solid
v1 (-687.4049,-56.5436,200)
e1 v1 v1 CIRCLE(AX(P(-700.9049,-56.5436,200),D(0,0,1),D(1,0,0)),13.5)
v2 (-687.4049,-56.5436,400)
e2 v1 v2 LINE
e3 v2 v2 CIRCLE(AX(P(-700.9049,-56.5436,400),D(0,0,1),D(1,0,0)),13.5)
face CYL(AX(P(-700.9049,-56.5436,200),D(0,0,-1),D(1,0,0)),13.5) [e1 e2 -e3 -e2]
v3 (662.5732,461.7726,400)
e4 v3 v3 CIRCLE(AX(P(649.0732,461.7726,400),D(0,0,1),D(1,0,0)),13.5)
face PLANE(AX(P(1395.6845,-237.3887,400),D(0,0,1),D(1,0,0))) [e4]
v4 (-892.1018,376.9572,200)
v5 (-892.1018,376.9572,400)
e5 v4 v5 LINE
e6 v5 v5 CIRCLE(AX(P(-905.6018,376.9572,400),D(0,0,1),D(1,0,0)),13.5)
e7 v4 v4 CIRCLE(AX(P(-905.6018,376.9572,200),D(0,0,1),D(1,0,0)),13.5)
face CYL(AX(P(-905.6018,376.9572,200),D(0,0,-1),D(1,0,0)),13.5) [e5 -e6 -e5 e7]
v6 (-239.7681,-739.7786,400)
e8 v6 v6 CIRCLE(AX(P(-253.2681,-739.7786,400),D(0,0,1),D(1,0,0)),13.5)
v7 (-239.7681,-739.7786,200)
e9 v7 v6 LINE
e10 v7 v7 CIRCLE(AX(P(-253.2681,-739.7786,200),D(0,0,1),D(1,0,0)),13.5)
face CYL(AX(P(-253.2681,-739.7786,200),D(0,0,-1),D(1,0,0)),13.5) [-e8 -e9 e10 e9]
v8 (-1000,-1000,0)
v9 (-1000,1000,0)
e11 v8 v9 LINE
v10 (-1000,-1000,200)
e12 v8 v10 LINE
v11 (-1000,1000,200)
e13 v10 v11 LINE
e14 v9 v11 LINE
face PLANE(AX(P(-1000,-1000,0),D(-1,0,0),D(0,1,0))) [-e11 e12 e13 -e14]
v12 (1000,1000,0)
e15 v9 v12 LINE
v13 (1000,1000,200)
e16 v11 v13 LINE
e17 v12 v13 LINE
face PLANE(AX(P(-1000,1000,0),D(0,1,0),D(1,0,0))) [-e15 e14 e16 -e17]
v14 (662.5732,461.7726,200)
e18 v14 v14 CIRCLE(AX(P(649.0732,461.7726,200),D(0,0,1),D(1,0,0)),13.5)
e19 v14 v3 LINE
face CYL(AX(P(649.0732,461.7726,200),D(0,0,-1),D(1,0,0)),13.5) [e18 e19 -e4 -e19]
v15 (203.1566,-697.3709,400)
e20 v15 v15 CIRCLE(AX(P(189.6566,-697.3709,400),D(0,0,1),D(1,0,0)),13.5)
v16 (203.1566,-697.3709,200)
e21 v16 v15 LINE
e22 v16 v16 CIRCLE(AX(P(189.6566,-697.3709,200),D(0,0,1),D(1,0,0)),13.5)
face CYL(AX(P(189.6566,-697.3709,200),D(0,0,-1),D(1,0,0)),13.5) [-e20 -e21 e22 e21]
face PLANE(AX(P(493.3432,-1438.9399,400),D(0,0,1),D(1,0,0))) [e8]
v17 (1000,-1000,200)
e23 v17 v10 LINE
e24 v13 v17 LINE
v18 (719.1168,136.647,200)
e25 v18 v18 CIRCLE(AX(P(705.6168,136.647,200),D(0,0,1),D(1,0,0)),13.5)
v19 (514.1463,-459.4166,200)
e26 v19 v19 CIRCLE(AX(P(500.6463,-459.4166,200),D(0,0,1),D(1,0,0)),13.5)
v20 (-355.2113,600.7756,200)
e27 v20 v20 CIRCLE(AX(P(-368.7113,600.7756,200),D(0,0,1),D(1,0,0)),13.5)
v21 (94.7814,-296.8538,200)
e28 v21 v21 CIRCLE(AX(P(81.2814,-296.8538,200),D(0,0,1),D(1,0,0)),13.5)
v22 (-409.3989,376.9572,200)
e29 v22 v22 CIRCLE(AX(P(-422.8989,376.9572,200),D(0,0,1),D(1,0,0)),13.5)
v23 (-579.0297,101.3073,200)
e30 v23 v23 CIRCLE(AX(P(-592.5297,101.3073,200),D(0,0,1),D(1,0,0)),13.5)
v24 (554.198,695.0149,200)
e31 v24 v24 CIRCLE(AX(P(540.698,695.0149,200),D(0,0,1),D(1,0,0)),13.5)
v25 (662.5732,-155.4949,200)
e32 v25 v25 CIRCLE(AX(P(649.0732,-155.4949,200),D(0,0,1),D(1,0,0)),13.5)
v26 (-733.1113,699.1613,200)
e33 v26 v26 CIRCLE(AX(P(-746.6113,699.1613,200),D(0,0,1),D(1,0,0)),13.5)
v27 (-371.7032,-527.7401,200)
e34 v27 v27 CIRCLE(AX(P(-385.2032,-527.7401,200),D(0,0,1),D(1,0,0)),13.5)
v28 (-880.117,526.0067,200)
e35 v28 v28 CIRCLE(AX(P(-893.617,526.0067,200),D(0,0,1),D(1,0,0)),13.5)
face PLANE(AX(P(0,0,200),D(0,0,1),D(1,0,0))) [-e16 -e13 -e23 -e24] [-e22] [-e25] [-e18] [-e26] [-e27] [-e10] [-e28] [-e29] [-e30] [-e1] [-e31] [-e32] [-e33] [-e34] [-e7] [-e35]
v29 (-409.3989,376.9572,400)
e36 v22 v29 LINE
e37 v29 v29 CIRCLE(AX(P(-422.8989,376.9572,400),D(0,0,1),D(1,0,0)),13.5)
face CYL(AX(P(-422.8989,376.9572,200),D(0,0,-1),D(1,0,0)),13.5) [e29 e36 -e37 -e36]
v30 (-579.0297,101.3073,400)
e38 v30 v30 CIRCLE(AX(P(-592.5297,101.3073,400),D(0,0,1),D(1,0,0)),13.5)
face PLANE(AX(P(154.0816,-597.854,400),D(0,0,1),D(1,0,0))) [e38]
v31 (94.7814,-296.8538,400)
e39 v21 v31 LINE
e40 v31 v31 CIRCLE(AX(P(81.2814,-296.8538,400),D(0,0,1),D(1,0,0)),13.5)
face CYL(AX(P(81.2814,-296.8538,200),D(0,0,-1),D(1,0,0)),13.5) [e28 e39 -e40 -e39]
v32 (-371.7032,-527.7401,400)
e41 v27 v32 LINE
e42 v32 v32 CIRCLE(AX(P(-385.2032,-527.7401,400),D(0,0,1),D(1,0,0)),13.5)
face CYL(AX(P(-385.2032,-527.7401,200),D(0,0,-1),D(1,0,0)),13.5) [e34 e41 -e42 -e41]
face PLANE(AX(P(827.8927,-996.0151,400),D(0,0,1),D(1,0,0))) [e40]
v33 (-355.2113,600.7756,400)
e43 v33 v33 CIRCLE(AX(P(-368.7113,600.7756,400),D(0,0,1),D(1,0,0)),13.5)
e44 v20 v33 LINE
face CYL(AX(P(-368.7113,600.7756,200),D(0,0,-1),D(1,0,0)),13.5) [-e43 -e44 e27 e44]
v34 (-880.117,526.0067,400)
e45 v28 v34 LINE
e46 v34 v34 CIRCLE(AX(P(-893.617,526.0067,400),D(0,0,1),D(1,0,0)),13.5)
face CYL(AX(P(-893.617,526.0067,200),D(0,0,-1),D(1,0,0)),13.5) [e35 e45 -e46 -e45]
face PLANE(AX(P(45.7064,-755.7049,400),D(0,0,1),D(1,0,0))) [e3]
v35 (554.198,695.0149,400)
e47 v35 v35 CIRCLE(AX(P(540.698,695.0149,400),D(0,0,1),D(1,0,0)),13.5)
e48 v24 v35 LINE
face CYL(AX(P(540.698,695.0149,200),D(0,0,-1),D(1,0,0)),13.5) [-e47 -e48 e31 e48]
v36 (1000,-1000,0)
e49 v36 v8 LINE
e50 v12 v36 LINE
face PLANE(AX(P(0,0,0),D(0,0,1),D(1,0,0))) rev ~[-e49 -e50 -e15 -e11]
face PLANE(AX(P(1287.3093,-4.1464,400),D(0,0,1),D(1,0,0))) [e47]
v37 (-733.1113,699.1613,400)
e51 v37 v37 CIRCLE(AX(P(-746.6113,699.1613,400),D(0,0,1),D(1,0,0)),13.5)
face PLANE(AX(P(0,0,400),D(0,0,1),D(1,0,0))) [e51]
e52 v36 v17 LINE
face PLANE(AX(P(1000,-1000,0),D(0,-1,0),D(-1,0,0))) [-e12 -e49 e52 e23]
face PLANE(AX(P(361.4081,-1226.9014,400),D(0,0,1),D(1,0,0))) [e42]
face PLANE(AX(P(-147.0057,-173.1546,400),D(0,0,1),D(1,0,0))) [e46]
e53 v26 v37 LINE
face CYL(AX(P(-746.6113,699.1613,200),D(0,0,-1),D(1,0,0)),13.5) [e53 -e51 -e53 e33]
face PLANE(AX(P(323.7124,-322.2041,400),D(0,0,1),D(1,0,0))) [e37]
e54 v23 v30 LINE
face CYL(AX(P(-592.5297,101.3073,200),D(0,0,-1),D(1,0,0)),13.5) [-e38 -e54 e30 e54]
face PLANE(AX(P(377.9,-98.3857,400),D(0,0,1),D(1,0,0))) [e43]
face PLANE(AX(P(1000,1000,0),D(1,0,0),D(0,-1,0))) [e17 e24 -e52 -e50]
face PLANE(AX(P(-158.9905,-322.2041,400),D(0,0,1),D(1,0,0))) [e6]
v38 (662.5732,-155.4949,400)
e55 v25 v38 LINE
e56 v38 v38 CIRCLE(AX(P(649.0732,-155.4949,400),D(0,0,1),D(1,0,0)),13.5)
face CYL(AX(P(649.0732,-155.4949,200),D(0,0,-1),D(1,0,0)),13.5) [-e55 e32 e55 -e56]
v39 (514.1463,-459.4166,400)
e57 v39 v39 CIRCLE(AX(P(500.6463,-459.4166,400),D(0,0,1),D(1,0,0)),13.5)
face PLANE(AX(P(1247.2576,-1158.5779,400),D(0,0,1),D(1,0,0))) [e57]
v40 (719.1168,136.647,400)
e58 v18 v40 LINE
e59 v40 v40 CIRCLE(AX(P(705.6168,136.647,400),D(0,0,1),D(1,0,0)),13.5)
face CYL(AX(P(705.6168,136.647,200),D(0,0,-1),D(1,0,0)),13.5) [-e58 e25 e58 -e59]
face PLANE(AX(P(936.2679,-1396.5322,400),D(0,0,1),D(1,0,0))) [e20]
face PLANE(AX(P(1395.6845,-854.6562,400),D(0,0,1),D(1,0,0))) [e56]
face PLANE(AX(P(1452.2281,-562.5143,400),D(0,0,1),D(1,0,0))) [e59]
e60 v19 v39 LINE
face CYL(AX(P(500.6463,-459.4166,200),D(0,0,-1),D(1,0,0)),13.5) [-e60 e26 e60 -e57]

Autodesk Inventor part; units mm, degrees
ref_plane "YZ Plane" through (0, 0, 0) normal (1, 0, 0) x (0, 1, 0)
ref_plane "XZ Plane" through (0, 0, 0) normal (0, 1, 0) x (-1, 0, 0)
ref_plane "XY Plane" through (0, 0, 0) normal (0, 0, 1) x (1, 0, 0)
sketch "Sketch1" plane through (0, 0, 0) normal (0, 0, 1) x (1, 0, 0)
  line L0 (-1000, 1000) -> (1000, 1000)
  line L1 (1000, 1000) -> (1000, -1000)
  line L2 (1000, -1000) -> (-1000, -1000)
  line L3 (-1000, -1000) -> (-1000, 1000)
  line L4 (-1000, 1000) -> (1000, -1000) construction
  line L5 (1000, 1000) -> (-1000, -1000) construction
  point P0 (0, 0)
  dimension "d0" = 2000
  dimension "d1" = 2000
extrude "Extrusion1" add sketch "Sketch1" along normal blind 200
sketch "Sketch2" plane through (0, 0, 200) normal (0, 0, 1) x (1, 0, 0)
  circle A0 centre (-746.6113, 699.1613) radius 13.5
  point P0 (0, 0)
  dimension "d4" = 27
extrude "Extrusion2" add sketch "Sketch2" along normal blind 200
pattern_sketch "Sketch Driven Pattern1" of "Extrusion2" from (-746.6113, 699.1613, 200) copies at (-368.7113, 600.7756, 200) at (540.698, 695.0149, 200) at (649.0732, 461.7726, 200) at (705.6168, 136.647, 200) at (649.0732, -155.4949, 200) at (500.6463, -459.4166, 200) at (189.6566, -697.3709, 200) at (-253.2681, -739.7786, 200) at (-385.2032, -527.7401, 200) at (81.2814, -296.8538, 200) at (-422.8989, 376.9572, 200) at (-592.5297, 101.3073, 200) at (-700.9049, -56.5436, 200) at (-893.617, 526.0067, 200) at (-905.6018, 376.9572, 200)
sketch "Sketch3" plane through (0, 0, 200) normal (0, 0, 1) x (1, 0, 0)
  point P0 (-368.7113, 600.7756)
  point P1 (175.5207, 631.4034)
  point P2 (540.698, 695.0149)
  point P3 (649.0732, 461.7726)
  point P4 (705.6168, 136.647)
  point P5 (649.0732, -155.4949)
  point P6 (500.6463, -459.4166)
  point P7 (189.6566, -697.3709)
  point P8 (-253.2681, -739.7786)
  point P9 (-385.2032, -527.7401)
  point P10 (81.2814, -296.8538)
  point P11 (-422.8989, 376.9572)
  point P12 (-592.5297, 101.3073)
  point P13 (-700.9049, -56.5436)
  point P14 (-893.617, 526.0067)
  point P15 (-905.6018, 376.9572)
